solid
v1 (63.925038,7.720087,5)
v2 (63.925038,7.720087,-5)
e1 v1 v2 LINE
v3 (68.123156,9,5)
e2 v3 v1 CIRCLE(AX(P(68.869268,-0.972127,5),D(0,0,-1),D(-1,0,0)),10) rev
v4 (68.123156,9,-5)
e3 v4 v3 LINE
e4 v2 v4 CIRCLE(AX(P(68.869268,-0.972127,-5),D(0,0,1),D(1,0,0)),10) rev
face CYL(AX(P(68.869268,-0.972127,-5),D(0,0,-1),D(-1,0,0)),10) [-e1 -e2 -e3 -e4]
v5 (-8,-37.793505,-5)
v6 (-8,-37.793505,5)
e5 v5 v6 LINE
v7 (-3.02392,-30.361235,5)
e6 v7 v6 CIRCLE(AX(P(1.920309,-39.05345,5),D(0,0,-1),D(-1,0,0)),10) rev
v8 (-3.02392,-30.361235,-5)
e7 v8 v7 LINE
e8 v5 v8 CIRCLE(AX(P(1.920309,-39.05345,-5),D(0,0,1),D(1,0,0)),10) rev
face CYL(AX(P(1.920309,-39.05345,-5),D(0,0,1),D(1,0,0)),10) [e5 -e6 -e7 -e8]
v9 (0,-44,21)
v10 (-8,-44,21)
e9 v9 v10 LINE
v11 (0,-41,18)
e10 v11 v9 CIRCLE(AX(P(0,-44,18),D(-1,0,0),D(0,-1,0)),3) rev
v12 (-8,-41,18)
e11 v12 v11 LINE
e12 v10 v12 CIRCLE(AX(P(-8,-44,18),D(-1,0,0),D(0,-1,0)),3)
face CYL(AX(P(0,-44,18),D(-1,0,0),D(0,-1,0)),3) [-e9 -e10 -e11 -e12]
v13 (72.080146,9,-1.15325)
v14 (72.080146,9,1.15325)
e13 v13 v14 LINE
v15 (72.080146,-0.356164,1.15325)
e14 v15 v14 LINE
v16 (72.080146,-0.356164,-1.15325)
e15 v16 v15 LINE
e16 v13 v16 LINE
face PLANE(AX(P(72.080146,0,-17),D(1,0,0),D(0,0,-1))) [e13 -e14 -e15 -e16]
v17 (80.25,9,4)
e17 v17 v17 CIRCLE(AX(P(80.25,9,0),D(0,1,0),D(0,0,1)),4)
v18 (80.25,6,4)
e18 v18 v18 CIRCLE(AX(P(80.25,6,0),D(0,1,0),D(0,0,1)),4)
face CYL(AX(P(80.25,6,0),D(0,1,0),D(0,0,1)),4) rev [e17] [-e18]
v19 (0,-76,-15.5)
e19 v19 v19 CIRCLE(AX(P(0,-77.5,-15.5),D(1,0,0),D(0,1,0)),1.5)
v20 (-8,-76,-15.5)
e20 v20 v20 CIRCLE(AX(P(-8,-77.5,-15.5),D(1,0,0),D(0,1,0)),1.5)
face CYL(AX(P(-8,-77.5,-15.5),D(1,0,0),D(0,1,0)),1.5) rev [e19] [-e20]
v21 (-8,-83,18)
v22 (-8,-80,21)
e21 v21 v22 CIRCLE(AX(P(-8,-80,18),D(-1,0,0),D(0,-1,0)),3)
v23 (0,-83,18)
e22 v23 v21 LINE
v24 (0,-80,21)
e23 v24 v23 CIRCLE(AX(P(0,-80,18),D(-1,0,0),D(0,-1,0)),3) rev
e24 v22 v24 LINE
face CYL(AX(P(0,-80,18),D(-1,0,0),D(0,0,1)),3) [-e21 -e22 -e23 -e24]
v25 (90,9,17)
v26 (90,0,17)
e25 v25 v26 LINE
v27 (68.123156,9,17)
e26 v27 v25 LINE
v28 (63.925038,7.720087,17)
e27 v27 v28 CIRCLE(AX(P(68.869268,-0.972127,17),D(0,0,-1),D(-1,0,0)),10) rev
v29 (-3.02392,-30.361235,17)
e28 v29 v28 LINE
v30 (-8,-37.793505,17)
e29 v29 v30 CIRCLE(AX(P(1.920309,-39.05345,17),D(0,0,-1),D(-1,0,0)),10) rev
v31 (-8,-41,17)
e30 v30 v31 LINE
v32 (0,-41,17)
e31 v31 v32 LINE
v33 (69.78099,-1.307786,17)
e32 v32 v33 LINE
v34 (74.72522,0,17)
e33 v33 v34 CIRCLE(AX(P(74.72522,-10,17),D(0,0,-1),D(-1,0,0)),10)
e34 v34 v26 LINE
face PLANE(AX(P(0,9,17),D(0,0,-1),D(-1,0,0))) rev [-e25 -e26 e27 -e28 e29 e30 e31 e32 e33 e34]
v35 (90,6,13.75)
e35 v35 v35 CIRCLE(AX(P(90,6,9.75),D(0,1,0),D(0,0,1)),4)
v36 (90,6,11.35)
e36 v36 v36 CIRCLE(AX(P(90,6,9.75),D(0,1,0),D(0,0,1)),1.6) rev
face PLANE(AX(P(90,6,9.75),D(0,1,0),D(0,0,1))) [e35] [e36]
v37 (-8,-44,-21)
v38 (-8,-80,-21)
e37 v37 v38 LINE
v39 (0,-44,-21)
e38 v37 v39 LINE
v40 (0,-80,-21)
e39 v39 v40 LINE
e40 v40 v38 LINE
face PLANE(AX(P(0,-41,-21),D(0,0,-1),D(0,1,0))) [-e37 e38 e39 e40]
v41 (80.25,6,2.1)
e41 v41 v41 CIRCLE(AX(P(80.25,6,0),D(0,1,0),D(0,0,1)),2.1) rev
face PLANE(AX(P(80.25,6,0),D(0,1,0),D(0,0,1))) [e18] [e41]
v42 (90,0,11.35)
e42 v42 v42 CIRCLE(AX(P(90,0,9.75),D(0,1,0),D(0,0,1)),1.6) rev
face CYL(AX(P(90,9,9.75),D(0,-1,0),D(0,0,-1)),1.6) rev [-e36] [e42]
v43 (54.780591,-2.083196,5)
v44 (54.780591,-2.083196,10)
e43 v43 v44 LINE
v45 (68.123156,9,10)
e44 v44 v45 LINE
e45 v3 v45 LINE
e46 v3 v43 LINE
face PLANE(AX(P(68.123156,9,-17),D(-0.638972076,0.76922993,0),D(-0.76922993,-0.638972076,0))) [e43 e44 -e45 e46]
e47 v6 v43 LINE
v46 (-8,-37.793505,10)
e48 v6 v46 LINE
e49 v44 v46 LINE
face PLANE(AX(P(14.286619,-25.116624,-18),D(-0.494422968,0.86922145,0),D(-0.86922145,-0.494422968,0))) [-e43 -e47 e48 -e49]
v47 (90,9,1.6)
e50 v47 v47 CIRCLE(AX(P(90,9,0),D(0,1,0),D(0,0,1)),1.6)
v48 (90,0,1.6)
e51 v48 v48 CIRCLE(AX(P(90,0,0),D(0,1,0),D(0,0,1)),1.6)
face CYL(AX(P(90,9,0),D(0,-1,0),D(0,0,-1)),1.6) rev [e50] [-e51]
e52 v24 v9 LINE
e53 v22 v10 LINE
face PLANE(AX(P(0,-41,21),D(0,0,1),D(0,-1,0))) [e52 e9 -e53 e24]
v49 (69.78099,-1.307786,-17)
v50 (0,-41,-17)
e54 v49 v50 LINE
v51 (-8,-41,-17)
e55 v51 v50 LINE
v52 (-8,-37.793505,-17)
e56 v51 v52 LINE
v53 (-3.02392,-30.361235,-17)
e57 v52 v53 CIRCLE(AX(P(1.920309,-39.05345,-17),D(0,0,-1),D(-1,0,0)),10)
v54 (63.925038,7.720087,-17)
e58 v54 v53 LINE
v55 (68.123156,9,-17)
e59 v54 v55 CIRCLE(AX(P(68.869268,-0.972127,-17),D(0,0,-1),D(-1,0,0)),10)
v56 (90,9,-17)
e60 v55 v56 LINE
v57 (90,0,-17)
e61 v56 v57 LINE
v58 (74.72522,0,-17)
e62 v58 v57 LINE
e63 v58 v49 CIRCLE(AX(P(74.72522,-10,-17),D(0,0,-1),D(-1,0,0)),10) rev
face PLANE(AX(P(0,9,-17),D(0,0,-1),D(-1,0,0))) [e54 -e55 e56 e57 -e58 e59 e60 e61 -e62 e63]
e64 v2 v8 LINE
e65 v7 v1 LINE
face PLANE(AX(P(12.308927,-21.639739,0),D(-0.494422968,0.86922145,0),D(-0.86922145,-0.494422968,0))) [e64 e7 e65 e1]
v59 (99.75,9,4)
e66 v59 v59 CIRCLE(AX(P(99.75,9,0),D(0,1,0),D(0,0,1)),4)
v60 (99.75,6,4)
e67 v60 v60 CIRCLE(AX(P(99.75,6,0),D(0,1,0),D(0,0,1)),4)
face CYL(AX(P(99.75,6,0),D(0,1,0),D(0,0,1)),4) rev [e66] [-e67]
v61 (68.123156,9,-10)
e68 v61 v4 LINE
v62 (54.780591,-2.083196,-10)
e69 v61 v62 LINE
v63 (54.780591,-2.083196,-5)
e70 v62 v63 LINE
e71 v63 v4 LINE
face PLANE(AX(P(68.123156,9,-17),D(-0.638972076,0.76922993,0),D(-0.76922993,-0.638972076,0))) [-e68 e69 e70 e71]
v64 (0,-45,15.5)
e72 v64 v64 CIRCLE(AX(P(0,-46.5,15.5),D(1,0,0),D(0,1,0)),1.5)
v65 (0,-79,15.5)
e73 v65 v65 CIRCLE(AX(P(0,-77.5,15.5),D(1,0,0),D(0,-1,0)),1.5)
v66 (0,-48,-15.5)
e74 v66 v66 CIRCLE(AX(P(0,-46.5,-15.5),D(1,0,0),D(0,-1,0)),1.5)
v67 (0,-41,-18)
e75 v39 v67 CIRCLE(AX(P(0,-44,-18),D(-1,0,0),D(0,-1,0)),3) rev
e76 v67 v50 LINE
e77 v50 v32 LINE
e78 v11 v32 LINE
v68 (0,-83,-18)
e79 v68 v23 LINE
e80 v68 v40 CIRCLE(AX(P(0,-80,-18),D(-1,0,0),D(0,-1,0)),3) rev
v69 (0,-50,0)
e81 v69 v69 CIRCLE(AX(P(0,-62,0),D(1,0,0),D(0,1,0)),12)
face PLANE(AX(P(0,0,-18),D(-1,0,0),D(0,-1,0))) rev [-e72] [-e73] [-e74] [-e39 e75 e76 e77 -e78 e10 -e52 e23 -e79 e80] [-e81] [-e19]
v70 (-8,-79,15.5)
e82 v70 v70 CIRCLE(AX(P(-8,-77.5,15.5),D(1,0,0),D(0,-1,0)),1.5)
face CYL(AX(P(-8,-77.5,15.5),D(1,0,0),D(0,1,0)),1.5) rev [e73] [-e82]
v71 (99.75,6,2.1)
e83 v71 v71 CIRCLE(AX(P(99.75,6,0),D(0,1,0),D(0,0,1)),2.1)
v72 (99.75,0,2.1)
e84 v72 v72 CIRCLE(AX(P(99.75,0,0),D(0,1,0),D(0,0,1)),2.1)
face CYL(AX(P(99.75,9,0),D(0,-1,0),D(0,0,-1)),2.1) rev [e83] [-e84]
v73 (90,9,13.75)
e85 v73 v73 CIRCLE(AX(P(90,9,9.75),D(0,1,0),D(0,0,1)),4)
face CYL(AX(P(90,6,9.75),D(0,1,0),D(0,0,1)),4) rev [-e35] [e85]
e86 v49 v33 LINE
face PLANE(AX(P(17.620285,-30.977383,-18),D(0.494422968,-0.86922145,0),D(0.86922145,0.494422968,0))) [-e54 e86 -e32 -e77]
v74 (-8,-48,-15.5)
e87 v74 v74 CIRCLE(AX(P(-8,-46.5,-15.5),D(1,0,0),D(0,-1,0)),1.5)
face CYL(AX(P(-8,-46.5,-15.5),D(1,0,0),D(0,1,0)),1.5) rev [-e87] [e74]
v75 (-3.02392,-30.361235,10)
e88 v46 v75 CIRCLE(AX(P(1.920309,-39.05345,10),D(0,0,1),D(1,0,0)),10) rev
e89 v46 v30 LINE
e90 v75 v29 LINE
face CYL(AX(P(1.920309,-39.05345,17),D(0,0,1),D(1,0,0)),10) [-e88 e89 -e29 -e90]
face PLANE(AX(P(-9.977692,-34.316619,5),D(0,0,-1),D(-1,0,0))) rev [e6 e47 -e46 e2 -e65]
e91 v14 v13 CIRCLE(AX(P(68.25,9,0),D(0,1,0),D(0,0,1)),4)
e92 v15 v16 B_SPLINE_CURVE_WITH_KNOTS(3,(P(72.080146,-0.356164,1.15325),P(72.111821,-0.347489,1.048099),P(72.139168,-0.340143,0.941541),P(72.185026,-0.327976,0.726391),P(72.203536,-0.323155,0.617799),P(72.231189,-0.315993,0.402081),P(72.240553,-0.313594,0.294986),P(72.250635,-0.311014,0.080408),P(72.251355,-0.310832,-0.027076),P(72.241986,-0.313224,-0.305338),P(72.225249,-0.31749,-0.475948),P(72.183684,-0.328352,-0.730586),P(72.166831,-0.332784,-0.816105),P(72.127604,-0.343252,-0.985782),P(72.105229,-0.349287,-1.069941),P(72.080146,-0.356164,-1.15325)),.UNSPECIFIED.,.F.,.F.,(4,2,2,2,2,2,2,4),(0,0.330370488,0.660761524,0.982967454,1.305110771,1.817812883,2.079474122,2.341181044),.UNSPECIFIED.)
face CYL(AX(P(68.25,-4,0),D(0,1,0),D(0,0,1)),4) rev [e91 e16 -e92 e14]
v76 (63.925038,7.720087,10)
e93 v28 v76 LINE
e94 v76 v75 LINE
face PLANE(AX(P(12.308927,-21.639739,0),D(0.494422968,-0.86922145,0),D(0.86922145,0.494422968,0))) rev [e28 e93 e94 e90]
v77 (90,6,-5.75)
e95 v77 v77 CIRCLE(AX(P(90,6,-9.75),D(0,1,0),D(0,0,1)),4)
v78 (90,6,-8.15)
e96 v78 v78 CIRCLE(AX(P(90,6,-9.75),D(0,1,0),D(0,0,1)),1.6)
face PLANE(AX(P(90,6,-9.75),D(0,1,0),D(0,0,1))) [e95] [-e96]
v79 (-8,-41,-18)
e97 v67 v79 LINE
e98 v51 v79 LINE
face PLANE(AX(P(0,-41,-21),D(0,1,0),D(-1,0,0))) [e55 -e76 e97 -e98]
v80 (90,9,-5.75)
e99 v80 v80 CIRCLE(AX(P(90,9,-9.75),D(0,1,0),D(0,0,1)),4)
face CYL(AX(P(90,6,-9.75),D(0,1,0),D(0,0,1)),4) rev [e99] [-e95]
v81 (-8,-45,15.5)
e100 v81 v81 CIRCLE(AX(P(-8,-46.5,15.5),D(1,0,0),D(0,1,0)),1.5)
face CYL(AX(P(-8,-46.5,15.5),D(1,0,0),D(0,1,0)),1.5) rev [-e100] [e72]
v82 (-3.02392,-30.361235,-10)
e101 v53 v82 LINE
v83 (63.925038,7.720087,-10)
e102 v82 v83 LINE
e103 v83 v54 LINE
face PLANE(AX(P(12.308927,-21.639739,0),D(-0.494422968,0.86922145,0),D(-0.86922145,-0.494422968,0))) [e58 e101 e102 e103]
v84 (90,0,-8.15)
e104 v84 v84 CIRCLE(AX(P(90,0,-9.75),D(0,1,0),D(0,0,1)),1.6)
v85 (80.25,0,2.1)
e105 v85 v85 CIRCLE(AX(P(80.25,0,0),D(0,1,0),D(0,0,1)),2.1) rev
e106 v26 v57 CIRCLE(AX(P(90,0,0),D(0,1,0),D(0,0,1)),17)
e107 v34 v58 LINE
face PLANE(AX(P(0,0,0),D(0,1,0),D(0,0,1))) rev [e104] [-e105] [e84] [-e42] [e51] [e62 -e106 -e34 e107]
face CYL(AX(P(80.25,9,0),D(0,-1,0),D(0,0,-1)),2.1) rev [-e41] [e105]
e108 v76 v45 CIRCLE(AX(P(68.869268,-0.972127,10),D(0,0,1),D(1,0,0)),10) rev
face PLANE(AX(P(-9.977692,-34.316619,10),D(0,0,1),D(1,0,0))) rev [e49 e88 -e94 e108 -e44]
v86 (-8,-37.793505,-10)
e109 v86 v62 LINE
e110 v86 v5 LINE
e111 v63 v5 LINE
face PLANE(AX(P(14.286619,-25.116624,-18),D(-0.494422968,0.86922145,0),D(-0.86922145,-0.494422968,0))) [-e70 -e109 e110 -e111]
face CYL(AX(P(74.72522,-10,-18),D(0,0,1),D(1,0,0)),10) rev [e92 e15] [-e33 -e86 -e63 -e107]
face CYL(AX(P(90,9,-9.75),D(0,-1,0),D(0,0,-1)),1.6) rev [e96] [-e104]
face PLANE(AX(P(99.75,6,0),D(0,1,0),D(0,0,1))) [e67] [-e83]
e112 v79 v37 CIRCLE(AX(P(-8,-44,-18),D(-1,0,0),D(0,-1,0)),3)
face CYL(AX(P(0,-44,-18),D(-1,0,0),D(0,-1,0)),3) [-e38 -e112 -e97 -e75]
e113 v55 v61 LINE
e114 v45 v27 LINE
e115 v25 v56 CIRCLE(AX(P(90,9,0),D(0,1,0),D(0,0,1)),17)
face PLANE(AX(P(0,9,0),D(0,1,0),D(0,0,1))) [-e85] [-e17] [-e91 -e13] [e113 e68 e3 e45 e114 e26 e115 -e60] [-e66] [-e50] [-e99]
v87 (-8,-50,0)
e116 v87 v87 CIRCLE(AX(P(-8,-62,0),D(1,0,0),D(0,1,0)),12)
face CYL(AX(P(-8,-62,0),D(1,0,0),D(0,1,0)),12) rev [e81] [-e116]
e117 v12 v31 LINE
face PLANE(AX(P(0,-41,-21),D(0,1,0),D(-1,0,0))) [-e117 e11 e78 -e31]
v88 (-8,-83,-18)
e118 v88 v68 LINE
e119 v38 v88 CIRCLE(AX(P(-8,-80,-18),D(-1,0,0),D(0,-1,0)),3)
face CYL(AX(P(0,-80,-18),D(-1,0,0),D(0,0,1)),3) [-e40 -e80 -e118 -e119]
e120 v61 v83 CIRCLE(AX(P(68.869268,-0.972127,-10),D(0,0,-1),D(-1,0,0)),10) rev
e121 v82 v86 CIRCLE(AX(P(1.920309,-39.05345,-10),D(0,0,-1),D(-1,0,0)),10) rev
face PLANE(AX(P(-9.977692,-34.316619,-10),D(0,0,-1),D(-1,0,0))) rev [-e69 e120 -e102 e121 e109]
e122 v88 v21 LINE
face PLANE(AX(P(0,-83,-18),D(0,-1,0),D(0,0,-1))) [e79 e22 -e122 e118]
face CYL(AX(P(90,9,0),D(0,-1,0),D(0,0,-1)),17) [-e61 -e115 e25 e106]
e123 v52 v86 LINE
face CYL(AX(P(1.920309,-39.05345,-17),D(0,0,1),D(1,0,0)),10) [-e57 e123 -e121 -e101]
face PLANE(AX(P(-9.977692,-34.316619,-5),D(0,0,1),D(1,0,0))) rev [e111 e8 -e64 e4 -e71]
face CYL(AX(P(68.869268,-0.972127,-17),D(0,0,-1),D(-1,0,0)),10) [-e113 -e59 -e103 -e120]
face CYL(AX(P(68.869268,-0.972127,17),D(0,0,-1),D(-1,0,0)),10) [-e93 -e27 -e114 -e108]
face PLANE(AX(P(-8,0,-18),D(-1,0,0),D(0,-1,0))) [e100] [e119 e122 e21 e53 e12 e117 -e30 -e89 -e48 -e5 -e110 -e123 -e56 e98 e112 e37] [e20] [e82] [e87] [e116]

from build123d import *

# Parameters (mm, degrees)
SKETCH_1_R           = 1.6
SKETCH_1_R_2         = 2.1
EXTRUDE_2_DEPTH      = 9
SKETCH_3_R           = 4
CUT_EXTRUDE_2_DEPTH  = 3
SKETCH_4_W           = 22.834782432
SKETCH_4_H           = 34.021608207
CUT_EXTRUDE_3_DEPTH  = 10
SKETCH_5_W           = 8
SKETCH_5_H           = 34
SKETCH_5_R           = 1.6
EXTRUDE_3_DEPTH      = 6
SKETCH_6_R           = 3.5
CUT_EXTRUDE_4_DEPTH  = 3
CUT_EXTRUDE_5_DEPTH  = 13
EXTRUDE_4_DEPTH      = 35
CUT_EXTRUDE_6_DEPTH  = 40
SKETCH_10_W          = 118.393769374
SKETCH_10_H          = 1
CUT_EXTRUDE_7_DEPTH  = 40
SKETCH_11_W          = 80.430163382
SKETCH_11_H          = 7.146133908
CUT_EXTRUDE_8_DEPTH  = 40
EXTRUDE_5_DEPTH      = 34
SKETCH_14_W          = 42
SKETCH_14_H          = 42
EXTRUDE_6_DEPTH      = 8
SKETCH_13_R          = 1.5
SKETCH_13_R_2        = 12
CUT_EXTRUDE_10_DEPTH = 8
SKETCH_15_W          = 89.303663432
SKETCH_15_H          = 7
SKETCH_15_H_2        = 10
EXTRUDE_7_DEPTH      = 4
FILLET_1_R           = 10
FILLET_2_R           = 10
FILLET_3_R           = 3


with BuildPart() as part:
    # 草图1 → 凸台-拉伸2 (new body)
    with BuildSketch(Plane(origin=(0, 0, 0), x_dir=(1, 0, 0), z_dir=(0, 1, 0))):
        with BuildLine():
            Line((0, 17), (90, 17))
            ThreePointArc((90, 17), (107, 0), (90, -17))
            Line((90, -17), (0, -17))
            ThreePointArc((0, -17), (-17, 0), (0, 17))
        make_face()
        with Locations(Location((90, 0, 0), (0, 0, 270))):
            Circle(SKETCH_1_R, mode=Mode.SUBTRACT)
        with Locations(Location((90, 9.75, 0), (0, 0, 270))):
            Circle(SKETCH_1_R, mode=Mode.SUBTRACT)
        with Locations(Location((99.75, 0, 0), (0, 0, 270))):
            Circle(SKETCH_1_R_2, mode=Mode.SUBTRACT)
        with Locations(Location((90, -9.75, 0), (0, 0, 270))):
            Circle(SKETCH_1_R, mode=Mode.SUBTRACT)
        with Locations(Location((80.25, 0, 0), (0, 0, 270))):
            Circle(SKETCH_1_R_2, mode=Mode.SUBTRACT)
    extrude(amount=EXTRUDE_2_DEPTH)

    # 草图3 → 切除-拉伸2 (cut)
    with BuildSketch(Plane(origin=(0, 9, 0), x_dir=(1, 0, 0), z_dir=(0, 1, 0))):
        with Locations(Location((90, 9.75, 0), (0, 0, 270))):
            Circle(SKETCH_3_R)
        with Locations(Location((99.75, 0, 0), (0, 0, 270))):
            Circle(SKETCH_3_R)
        with Locations(Location((90, -9.75, 0), (0, 0, 270))):
            Circle(SKETCH_3_R)
        with Locations(Location((80.25, 0, 0), (0, 0, 270))):
            Circle(SKETCH_3_R)
    extrude(amount=-CUT_EXTRUDE_2_DEPTH, mode=Mode.SUBTRACT)

    # 草图4 → 切除-拉伸3 (cut)
    with BuildSketch(Plane(origin=(0, 9, 0), x_dir=(1, 0, 0), z_dir=(0, 1, 0))):
        with Locations((-11.417391216, 0.010804103)):
            Rectangle(SKETCH_4_W, SKETCH_4_H)
    extrude(amount=-CUT_EXTRUDE_3_DEPTH, mode=Mode.SUBTRACT)

    # 草图5 → 凸台-拉伸3 (add)
    with BuildSketch(Plane(origin=(0, 9, 0), x_dir=(1, 0, 0), z_dir=(0, 1, 0))):
        with Locations((-4, 0)):
            Rectangle(SKETCH_5_W, SKETCH_5_H)
        with Locations(Location((-4, 10, 0), (0, 0, 270))):
            Circle(SKETCH_5_R, mode=Mode.SUBTRACT)
        with Locations(Location((-4, 0, 0), (0, 0, 270))):
            Circle(SKETCH_5_R, mode=Mode.SUBTRACT)
        with Locations(Location((-4, -10, 0), (0, 0, 270))):
            Circle(SKETCH_5_R, mode=Mode.SUBTRACT)
    extrude(amount=-EXTRUDE_3_DEPTH)

    # 草图6 → 切除-拉伸4 (cut)
    with BuildSketch(Plane(origin=(0, 9, 0), x_dir=(1, 0, 0), z_dir=(0, 1, 0))):
        with Locations(Location((-4, 10, 0), (0, 0, 270))):
            Circle(SKETCH_6_R)
        with Locations(Location((-4, 0, 0), (0, 0, 270))):
            Circle(SKETCH_6_R)
        with Locations(Location((-4, -10, 0), (0, 0, 270))):
            Circle(SKETCH_6_R)
    extrude(amount=-CUT_EXTRUDE_4_DEPTH, mode=Mode.SUBTRACT)

    # 草图7 → 切除-拉伸5 (cut)
    with BuildSketch(Plane(origin=(0, 9, 0), x_dir=(1, 0, 0), z_dir=(0, 1, 0))):
        with BuildLine():
            Line((68.25, -4), (7, -4))
            ThreePointArc((7, -4), (3, 0), (7, 4))
            Line((7, 4), (68.25, 4))
            ThreePointArc((68.25, 4), (72.25, 0), (68.25, -4))
        make_face()
    extrude(amount=-CUT_EXTRUDE_5_DEPTH, mode=Mode.SUBTRACT)

    # 草图8 → 凸台-拉伸4 (add)
    with BuildSketch(Plane.XY.offset(17)):
        Polygon((0, -83), (0, -41), (72.080145507, 0), (58.442959142, 0), (-8, -37.793504795), (-8, -41), (-8, -83), align=None)
    extrude(amount=-EXTRUDE_4_DEPTH)

    # 草图9 → 切除-拉伸6 (cut)
    with BuildSketch(Plane.XY.offset(17)):
        Polygon((58.442959142, 0), (68.123155874, 9), (-8, 9), (-8, 0), align=None)
    extrude(amount=-CUT_EXTRUDE_6_DEPTH, mode=Mode.SUBTRACT)

    # 草图10 → 切除-拉伸7 (cut)
    with BuildSketch(Plane(origin=(27.096230432, -29.144093474, 0), x_dir=(0.7323691027025148, 0.6809078479550029, 0), z_dir=(-0.6809078479550029, 0.7323691027025148, 0))):
        with Locations((-3.177419515, 17.5)):
            Rectangle(SKETCH_10_W, SKETCH_10_H)
    extrude(amount=-CUT_EXTRUDE_7_DEPTH, mode=Mode.SUBTRACT)

    # 草图11 → 切除-拉伸8 (cut)
    with BuildSketch(Plane(origin=(17.620285002, -30.977383092, 0), x_dir=(0.8692214499653501, 0.49442296763007937, 0), z_dir=(0.49442296763007937, -0.8692214499653501, 0))):
        with Locations((12.899580295, -20.573066954)):
            Rectangle(SKETCH_11_W, SKETCH_11_H)
    extrude(amount=-CUT_EXTRUDE_8_DEPTH, mode=Mode.SUBTRACT)

    # 草图12 → 凸台-拉伸5 (add)
    with BuildSketch(Plane.XY.offset(17)):
        Polygon((72.080145507, 0), (72.080145507, 9), (68.123155874, 9), (54.780591243, -2.083196181), (58.114256966, -7.94395497), align=None)
    extrude(amount=-EXTRUDE_5_DEPTH)

    # 草图14 → 凸台-拉伸6 (add)
    with BuildSketch(Plane.ZY.offset(8)):
        with Locations((0, -62)):
            Rectangle(SKETCH_14_W, SKETCH_14_H)
    extrude(amount=-EXTRUDE_6_DEPTH)

    # 草图13 → 切除-拉伸10 (cut)
    with BuildSketch(Plane(origin=(0, 0, 0), x_dir=(0, 0, -1), z_dir=(1, 0, 0))):
        with Locations(Location((-15.5, -46.5, 0), (0, 0, 90))):
            Circle(SKETCH_13_R)
        with Locations(Location((15.5, -46.5, 0), (0, 0, 270))):
            Circle(SKETCH_13_R)
        with Locations(Location((15.5, -77.5, 0), (0, 0, 90))):
            Circle(SKETCH_13_R)
        with Locations(Location((-15.5, -77.5, 0), (0, 0, 270))):
            Circle(SKETCH_13_R)
        with Locations(Location((0, -62, 0), (0, 0, 90))):
            Circle(SKETCH_13_R_2)
    extrude(amount=-CUT_EXTRUDE_10_DEPTH, mode=Mode.SUBTRACT)

    # 草图15 → 凸台-拉伸7 (add)
    with BuildSketch(Plane(origin=(14.286619279, -25.116624303, 0), x_dir=(0.86922144996535, 0.4944229676300795, 0), z_dir=(-0.4944229676300795, 0.86922144996535, 0))):
        with Locations((19.012083318, 13.5)):
            Rectangle(SKETCH_15_W, SKETCH_15_H)
        with Locations((19.012083318, 0)):
            Rectangle(SKETCH_15_W, SKETCH_15_H_2)
        with Locations((19.012083318, -13.5)):
            Rectangle(SKETCH_15_W, SKETCH_15_H)
    extrude(amount=EXTRUDE_7_DEPTH)

    # 圆角1
    # the kernel refuses this fillet: 10 mm, written as the material it takes off along each edge
    with BuildSketch(Plane(origin=(67.646967944, 9.837163299, -27.704780935), x_dir=(-0.8692214499653496, -0.4944229676300802, 0), z_dir=(0, 0, 1))) as fillet_1_piece_1:
        with BuildLine():
            CenterArc((4.281912374, 10), FILLET_1_R, 244.647173819, 25.352826181)
            Line((0, 0.963118546), (-0.085638247, 0.782380917))
            ThreePointArc((-0.085638247, 0.782380917), (-0.2, 0.481559273), (-0.2, 0))
            Line((-0.2, 0), (0, -0.2))
            Line((0, -0.2), (4.281912374, -0.2))
            Line((4.281912374, -0.2), (4.281912374, 0))
        make_face()
    extrude(amount=28.40956187, mode=Mode.SUBTRACT)
    with BuildSketch(Plane(origin=(67.646967944, 9.837163299, -15.704780935), x_dir=(-0.8692214499653494, -0.4944229676300803, 0), z_dir=(0, 0, 1))) as fillet_1_piece_2:
        with BuildLine():
            CenterArc((4.281912374, 10), FILLET_1_R, 244.647173819, 25.352826181)
            Line((0, 0.963118546), (-0.085638247, 0.782380917))
            ThreePointArc((-0.085638247, 0.782380917), (-0.2, 0.481559273), (-0.2, 0))
            Line((-0.2, 0), (0, -0.2))
            Line((0, -0.2), (4.281912374, -0.2))
            Line((4.281912374, -0.2), (4.281912374, 0))
        make_face()
    extrude(amount=31.40956187, mode=Mode.SUBTRACT)
    with BuildSketch(Plane(origin=(67.646967944, 9.837163299, 27.704780935), x_dir=(-0.8692214499653496, -0.4944229676300802, 0), z_dir=(0, 0, -1))) as fillet_1_piece_3:
        with BuildLine():
            CenterArc((4.281912374, -10), FILLET_1_R, 90, 25.352826181)
            Line((0, -0.963118546), (-0.085638247, -0.782380917))
            ThreePointArc((-0.085638247, -0.782380917), (-0.2, -0.481559273), (-0.2, 0))
            Line((-0.2, 0), (0, 0.2))
            Line((0, 0.2), (4.281912374, 0.2))
            Line((4.281912374, 0.2), (4.281912374, 0))
        make_face()
    extrude(amount=28.40956187, mode=Mode.SUBTRACT)
    with BuildSketch(Plane(origin=(-9.977691871, -34.316618995, 10), x_dir=(0.49442296763008015, -0.8692214499653496, 0), z_dir=(0, 0, -1))) as fillet_1_piece_4:
        with BuildLine():
            CenterArc((10, -8), FILLET_1_R, 126.869897646, 53.130102354)
            Line((0, -8), (-0.2, -8))
            Line((-0.2, -8), (-0.2, 0))
            Line((-0.2, 0), (0, 0.2))
            ThreePointArc((0, 0.2), (2, 0.2), (3.88, 0.16))
            Line((3.88, 0.16), (4, 0))
        make_face()
    extrude(amount=47, mode=Mode.SUBTRACT)
    with BuildSketch(Plane(origin=(-9.977691871, -34.316618995, 25), x_dir=(0.4944229676300804, -0.8692214499653496, 0), z_dir=(0, 0, -1))) as fillet_1_piece_5:
        with BuildLine():
            CenterArc((10, -8), FILLET_1_R, 126.869897646, 53.130102354)
            Line((0, -8), (-0.2, -8))
            Line((-0.2, -8), (-0.2, 0))
            Line((-0.2, 0), (0, 0.2))
            ThreePointArc((0, 0.2), (2, 0.2), (3.88, 0.16))
            Line((3.88, 0.16), (4, 0))
        make_face()
    extrude(amount=50, mode=Mode.SUBTRACT)
    with BuildSketch(Plane(origin=(-9.977691871, -34.316618995, -10), x_dir=(0.49442296763008015, -0.8692214499653496, 0), z_dir=(0, 0, 1))) as fillet_1_piece_6:
        with BuildLine():
            CenterArc((10, 8), FILLET_1_R, 180, 53.130102354)
            Line((0, 8), (-0.2, 8))
            Line((-0.2, 8), (-0.2, 0))
            Line((-0.2, 0), (0, -0.2))
            ThreePointArc((0, -0.2), (2, -0.2), (3.88, -0.16))
            Line((3.88, -0.16), (4, 0))
        make_face()
    extrude(amount=47, mode=Mode.SUBTRACT)

    # 圆角2
    # the kernel refuses this fillet: 10 mm, written as the material it adds along each edge
    with BuildSketch(Plane(origin=(72.080145507, 0, 17), x_dir=(-0.86922144996535, -0.4944229676300795, 0), z_dir=(0, 0, -1))) as fillet_2_piece_1_section:
        with BuildLine():
            CenterArc((FILLET_2_R * 0.264507433102, -FILLET_2_R), FILLET_2_R, 90, 29.631707367)
            Line((-FILLET_2_R * 0.229915534528, -FILLET_2_R * 0.130778550035), (0, 0))
            Line((0, 0), (FILLET_2_R * 0.264507433102, 0))
        make_face()
    fillet_2_piece_1 = extrude(amount=22.459435899, mode=Mode.PRIVATE)
    fillet_2_piece_1 = split(fillet_2_piece_1, bisect_by=Plane(origin=(72.080145507, -0.43196412, 9.594144242), z_dir=(-1, 0, 0)), keep=Keep.TOP, mode=Mode.PRIVATE)
    add(fillet_2_piece_1)
    with BuildSketch(Plane(origin=(72.080145507, 0, 17), x_dir=(-0.86922144996535, -0.4944229676300795, 0), z_dir=(0, 0, -1))) as fillet_2_piece_2_section:
        with BuildLine():
            CenterArc((FILLET_2_R * 0.264507433102, -FILLET_2_R), FILLET_2_R, 90, 29.631707367)
            Line((-FILLET_2_R * 0.229915534528, -FILLET_2_R * 0.130778550035), (0, 0))
            Line((0, 0), (FILLET_2_R * 0.264507433102, 0))
        make_face()
    fillet_2_piece_2 = extrude(amount=22.459435899, mode=Mode.PRIVATE)
    fillet_2_piece_2 = fillet_2_piece_2 - Plane(origin=(68.25, -0.105711956, 0), x_dir=(0, 0, -1), z_dir=(0, 1, 0)) * Cylinder(4, 56, mode=Mode.PRIVATE)
    add(fillet_2_piece_2)
    with BuildSketch(Plane(origin=(72.080145507, 0, 5.459435899), x_dir=(-0.86922144996535, -0.4944229676300795, 0), z_dir=(0, 0, -1))) as fillet_2_piece_3_section:
        with BuildLine():
            CenterArc((FILLET_2_R * 0.264507433102, -FILLET_2_R), FILLET_2_R, 90, 29.631707367)
            Line((-FILLET_2_R * 0.229915534528, -FILLET_2_R * 0.130778550035), (0, 0))
            Line((0, 0), (FILLET_2_R * 0.264507433102, 0))
        make_face()
    fillet_2_piece_3 = extrude(amount=22.459435899, mode=Mode.PRIVATE)
    fillet_2_piece_3 = split(fillet_2_piece_3, bisect_by=Plane(origin=(72.080145507, -0.402309052, 3.779769442), z_dir=(-1, 0, 0)), keep=Keep.TOP, mode=Mode.PRIVATE)
    add(fillet_2_piece_3)
    with BuildSketch(Plane(origin=(72.080145507, 0, 5.459435899), x_dir=(-0.86922144996535, -0.4944229676300795, 0), z_dir=(0, 0, -1))) as fillet_2_piece_4_section:
        with BuildLine():
            CenterArc((FILLET_2_R * 0.264507433102, -FILLET_2_R), FILLET_2_R, 90, 29.631707367)
            Line((-FILLET_2_R * 0.229915534528, -FILLET_2_R * 0.130778550035), (0, 0))
            Line((0, 0), (FILLET_2_R * 0.264507433102, 0))
        make_face()
    fillet_2_piece_4 = extrude(amount=22.459435899, mode=Mode.PRIVATE)
    fillet_2_piece_4 = fillet_2_piece_4 - Plane(origin=(68.25, -0.105711956, 0), x_dir=(0, 0, -1), z_dir=(0, 1, 0)) * Cylinder(4, 56, mode=Mode.PRIVATE)
    add(fillet_2_piece_4)

    # 圆角3
    fillet_3_edges = [part.edges().sort_by_distance(p)[0] for p in [
        (-4, -83, 21),
        (-4, -41, 21),
        (-4, -83, -21),
        (-4, -41, -21),
    ]]
    fillet(fillet_3_edges, radius=FILLET_3_R)


solid = part.part
